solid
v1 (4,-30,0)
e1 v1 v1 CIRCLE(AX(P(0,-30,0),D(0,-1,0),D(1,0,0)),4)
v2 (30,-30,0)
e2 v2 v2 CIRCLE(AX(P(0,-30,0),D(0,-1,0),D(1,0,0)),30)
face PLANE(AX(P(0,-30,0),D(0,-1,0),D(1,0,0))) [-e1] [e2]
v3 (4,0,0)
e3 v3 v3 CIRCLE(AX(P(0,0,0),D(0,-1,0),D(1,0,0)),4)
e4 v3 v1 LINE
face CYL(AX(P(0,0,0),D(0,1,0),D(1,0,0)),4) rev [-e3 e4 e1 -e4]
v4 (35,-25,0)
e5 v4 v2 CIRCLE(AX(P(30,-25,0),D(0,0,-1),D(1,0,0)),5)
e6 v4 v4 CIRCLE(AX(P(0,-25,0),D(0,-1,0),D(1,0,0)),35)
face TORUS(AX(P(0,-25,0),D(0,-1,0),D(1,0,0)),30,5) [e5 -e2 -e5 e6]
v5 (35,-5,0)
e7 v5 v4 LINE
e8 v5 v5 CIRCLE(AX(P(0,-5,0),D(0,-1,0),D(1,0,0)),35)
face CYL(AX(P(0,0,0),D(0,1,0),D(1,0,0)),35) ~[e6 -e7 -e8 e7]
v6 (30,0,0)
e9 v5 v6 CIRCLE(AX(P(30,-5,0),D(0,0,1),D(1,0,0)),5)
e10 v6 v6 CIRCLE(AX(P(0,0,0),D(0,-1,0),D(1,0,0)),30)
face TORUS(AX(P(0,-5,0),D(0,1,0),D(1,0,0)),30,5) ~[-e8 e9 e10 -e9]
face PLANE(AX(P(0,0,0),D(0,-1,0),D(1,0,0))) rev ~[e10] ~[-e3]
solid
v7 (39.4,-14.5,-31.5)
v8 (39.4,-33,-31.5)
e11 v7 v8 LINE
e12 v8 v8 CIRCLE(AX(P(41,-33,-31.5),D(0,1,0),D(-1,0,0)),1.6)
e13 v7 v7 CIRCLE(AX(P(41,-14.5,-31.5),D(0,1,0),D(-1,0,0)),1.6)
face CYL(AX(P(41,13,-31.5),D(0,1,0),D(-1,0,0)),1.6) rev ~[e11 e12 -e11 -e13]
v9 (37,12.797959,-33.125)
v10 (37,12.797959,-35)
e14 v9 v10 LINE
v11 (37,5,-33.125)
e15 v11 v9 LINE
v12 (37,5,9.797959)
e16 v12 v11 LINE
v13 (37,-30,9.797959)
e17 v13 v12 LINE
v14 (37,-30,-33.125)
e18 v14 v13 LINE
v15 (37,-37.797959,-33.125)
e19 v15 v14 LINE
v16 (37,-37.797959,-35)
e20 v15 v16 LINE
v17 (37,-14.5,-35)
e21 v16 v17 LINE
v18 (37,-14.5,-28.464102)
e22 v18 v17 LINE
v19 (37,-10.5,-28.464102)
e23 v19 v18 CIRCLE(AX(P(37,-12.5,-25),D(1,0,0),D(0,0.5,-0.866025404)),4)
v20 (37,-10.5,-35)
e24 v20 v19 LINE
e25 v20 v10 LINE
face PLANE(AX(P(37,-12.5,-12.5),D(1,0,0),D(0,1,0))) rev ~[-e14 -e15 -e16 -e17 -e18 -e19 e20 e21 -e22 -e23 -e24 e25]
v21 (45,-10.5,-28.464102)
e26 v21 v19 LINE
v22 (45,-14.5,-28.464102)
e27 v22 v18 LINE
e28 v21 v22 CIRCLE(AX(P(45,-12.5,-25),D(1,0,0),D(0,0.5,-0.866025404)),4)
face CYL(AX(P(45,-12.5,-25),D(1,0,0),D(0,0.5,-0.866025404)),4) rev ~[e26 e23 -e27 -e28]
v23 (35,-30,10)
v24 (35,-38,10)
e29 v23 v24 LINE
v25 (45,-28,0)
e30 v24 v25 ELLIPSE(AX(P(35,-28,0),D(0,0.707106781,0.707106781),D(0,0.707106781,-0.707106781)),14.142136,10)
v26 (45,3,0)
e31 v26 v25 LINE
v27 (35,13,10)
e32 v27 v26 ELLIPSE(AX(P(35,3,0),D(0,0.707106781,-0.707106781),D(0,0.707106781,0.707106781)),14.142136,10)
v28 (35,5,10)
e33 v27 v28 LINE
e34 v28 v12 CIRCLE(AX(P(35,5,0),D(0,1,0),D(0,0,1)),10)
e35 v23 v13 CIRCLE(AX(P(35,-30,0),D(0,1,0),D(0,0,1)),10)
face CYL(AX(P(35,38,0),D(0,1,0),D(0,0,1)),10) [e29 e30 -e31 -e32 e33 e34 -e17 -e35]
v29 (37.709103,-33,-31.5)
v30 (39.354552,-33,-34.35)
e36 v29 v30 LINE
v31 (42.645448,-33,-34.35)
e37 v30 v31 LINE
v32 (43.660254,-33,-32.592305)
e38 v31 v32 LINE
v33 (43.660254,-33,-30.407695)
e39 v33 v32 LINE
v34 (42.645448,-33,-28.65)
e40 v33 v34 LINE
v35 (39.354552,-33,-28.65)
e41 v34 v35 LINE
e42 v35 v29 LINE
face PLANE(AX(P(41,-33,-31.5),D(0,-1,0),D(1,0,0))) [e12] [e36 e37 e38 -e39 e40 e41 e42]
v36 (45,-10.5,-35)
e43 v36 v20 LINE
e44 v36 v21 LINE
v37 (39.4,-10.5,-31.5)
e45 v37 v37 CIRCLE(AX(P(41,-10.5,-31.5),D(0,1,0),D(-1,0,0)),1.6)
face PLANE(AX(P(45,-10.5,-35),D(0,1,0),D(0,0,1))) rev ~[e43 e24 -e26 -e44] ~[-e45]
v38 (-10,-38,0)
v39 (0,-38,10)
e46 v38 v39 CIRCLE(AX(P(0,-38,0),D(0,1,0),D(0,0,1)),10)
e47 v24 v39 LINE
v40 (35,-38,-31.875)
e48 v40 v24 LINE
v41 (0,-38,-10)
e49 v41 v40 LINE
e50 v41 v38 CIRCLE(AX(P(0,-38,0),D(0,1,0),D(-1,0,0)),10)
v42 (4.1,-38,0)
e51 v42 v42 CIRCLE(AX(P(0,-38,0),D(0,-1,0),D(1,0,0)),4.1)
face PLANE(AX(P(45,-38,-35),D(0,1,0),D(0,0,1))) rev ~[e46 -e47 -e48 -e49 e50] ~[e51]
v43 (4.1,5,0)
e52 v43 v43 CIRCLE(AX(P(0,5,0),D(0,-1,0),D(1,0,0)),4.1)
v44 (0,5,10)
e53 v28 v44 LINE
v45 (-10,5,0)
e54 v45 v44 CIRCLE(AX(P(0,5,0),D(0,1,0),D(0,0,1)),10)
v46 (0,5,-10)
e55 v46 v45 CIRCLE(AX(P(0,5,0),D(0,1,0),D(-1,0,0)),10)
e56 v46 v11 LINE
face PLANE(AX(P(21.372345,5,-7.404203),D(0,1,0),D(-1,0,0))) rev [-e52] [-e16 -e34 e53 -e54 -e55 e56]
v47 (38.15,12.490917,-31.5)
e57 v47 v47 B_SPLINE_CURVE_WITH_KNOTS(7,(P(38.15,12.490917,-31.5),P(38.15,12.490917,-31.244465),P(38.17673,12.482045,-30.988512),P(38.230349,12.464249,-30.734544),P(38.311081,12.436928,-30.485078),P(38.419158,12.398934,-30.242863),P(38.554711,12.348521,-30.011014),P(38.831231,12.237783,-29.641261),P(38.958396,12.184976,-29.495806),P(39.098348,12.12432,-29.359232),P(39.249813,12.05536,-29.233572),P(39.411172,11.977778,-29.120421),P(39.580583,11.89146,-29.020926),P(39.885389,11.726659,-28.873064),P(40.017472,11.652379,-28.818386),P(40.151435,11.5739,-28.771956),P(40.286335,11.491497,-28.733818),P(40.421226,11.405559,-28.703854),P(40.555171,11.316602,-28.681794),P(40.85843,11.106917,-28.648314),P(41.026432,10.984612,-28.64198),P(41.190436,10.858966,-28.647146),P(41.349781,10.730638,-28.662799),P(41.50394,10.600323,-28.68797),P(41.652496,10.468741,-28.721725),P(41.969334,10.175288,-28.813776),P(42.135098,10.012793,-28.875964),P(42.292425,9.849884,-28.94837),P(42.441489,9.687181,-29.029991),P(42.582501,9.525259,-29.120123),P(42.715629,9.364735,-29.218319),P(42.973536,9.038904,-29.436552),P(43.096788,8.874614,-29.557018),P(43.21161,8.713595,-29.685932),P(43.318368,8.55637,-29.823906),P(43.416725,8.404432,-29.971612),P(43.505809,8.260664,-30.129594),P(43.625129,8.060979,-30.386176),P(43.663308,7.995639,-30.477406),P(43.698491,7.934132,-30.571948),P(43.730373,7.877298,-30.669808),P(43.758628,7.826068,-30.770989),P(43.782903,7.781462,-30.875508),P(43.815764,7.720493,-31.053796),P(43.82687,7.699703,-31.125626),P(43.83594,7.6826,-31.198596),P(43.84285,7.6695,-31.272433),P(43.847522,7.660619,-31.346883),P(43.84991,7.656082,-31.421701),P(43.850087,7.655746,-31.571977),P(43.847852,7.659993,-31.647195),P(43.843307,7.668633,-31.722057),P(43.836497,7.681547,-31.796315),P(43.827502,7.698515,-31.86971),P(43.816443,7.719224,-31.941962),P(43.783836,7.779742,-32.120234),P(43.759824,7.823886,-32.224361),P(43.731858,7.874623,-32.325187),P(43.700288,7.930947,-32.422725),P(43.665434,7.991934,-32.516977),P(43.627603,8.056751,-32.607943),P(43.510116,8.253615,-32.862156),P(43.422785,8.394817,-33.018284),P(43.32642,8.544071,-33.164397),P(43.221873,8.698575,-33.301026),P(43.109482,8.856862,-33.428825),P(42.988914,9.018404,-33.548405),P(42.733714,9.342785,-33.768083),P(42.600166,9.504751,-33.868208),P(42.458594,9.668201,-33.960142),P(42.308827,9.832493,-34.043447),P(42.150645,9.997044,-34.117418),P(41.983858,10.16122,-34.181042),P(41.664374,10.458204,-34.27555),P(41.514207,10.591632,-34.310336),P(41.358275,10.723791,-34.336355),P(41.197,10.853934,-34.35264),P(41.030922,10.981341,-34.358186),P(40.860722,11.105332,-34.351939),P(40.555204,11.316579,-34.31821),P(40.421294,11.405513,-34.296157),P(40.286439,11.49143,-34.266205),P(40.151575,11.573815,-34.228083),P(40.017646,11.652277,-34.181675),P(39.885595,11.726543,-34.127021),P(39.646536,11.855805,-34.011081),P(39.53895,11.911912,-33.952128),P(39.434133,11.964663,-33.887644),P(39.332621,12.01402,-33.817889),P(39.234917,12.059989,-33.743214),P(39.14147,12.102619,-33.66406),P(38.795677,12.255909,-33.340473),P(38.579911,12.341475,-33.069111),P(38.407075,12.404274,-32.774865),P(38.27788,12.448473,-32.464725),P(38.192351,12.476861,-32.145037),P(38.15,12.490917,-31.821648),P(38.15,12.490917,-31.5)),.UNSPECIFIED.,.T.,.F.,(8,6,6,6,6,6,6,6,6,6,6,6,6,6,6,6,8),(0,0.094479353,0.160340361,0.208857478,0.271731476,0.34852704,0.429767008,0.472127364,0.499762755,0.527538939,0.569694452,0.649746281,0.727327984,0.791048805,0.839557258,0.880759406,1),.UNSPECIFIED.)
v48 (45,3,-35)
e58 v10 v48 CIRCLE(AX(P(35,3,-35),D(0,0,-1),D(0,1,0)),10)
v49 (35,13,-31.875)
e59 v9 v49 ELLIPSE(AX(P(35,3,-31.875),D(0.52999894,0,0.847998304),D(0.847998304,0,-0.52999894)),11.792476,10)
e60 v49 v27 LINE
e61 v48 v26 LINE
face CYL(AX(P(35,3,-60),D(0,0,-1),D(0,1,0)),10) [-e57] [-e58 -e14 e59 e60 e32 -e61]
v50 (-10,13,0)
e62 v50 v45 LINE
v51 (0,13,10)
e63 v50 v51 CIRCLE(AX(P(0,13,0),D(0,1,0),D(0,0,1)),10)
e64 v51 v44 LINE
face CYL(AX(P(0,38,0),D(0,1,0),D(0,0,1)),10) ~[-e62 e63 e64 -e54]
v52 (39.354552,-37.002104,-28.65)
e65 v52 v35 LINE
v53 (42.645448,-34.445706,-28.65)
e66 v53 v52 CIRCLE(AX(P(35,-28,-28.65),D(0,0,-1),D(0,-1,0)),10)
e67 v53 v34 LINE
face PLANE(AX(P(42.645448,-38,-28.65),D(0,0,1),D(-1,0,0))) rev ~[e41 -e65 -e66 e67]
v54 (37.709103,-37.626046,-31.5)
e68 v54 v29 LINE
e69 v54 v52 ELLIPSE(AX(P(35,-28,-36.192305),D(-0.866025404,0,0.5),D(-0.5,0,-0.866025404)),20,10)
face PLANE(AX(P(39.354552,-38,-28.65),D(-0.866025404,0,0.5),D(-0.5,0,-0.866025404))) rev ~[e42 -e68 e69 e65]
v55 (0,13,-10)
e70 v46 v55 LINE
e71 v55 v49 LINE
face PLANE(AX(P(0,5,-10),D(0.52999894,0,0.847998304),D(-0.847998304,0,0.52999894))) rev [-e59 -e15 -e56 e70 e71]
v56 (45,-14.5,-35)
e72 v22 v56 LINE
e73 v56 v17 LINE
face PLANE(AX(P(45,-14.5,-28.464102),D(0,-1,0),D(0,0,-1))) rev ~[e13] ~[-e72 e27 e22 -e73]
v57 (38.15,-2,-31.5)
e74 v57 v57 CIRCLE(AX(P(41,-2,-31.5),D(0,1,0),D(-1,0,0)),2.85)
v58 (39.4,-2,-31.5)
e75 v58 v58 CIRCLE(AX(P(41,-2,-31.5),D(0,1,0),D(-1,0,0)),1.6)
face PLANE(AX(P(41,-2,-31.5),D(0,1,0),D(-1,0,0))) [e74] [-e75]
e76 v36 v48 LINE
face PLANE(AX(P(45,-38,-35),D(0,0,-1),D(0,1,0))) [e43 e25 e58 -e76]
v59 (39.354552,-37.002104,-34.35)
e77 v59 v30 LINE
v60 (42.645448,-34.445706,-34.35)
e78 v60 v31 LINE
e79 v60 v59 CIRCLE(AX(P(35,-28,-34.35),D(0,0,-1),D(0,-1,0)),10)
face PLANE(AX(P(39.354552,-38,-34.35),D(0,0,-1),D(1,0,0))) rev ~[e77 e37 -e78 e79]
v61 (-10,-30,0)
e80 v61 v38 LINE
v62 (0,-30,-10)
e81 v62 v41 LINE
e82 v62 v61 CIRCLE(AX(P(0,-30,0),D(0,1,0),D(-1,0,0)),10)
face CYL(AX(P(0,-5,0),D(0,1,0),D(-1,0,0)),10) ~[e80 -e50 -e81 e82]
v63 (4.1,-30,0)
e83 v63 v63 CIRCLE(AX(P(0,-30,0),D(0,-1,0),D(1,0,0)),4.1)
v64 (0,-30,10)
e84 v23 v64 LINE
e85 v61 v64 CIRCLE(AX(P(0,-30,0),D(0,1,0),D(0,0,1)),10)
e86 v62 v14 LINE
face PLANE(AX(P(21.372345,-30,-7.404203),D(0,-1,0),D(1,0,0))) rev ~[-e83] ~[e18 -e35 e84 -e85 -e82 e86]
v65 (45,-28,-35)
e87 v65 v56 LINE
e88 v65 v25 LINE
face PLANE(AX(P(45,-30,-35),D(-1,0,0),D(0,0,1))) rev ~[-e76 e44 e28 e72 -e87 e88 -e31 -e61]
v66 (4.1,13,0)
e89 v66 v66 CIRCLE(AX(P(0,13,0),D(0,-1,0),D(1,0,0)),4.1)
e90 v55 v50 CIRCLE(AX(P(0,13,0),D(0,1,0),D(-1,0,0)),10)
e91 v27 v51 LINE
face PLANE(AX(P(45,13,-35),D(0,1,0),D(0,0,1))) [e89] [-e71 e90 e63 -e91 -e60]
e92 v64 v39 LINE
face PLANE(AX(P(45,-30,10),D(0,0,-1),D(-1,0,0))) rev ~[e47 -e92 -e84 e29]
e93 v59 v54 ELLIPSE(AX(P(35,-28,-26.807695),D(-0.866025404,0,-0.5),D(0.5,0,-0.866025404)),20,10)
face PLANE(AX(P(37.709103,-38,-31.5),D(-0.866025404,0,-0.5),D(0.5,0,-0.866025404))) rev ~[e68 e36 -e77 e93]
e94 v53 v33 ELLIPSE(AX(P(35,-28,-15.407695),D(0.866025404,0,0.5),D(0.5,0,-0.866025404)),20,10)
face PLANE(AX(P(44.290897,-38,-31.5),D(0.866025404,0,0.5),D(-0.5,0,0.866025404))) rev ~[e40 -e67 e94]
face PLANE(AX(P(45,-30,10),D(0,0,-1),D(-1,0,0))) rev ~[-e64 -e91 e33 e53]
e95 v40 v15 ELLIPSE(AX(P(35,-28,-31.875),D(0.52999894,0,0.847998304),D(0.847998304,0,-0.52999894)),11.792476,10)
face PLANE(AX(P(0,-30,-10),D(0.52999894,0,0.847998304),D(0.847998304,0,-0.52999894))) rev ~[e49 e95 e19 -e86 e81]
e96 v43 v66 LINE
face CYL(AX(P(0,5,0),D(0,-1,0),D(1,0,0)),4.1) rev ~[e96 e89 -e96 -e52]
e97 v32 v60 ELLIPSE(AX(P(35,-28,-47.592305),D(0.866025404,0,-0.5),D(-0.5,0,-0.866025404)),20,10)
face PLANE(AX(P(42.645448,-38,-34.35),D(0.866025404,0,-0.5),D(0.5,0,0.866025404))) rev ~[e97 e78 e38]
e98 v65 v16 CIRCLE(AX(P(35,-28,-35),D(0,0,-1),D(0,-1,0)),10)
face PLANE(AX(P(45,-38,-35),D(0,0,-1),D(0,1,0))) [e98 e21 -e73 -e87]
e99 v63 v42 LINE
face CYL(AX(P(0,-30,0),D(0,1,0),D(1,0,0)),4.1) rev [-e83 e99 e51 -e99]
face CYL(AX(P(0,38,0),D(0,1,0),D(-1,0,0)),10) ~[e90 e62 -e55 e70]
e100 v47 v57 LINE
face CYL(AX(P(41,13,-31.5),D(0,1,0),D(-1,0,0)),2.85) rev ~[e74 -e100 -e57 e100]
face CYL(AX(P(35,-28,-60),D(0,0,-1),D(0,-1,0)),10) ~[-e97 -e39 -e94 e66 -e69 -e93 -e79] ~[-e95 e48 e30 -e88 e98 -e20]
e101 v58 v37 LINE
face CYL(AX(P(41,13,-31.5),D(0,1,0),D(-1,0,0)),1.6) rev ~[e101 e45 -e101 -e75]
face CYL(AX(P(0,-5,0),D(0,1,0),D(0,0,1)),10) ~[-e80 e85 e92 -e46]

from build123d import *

# Parameters (mm, degrees)
F0_R         = 35
F0_R_2       = 4
F1_DEPTH     = 30
F2_R         = 5
F3_R         = 4.1
F4_DEPTH     = 8
F7_W         = 51
F7_H         = 45
F8_DEPTH     = 8
F11_DEPTH    = 8
F12_R        = 1.6
F13_DEPTH    = 51
F14_R        = 2.85
F15_DEPTH    = 15
F17_DEPTH    = 5
F18_T1_DEPTH = 58
F18_T3_DEPTH = 58
F18_T5_DEPTH = 101
F18_T7_DEPTH = 95


# Not quite as in the source:
# - a fillet or chamfer that OpenCascade refuses, or shapes differently, is made with other operations: its cross-section is extruded or revolved along the edge and cut away or added


with BuildPart() as f1:
    # F0 (on Front) → F1 (new body)
    with BuildSketch(Plane.XZ):
        Circle(F0_R)
        Circle(F0_R_2, mode=Mode.SUBTRACT)
    extrude(amount=F1_DEPTH)

    # F2
    f2_edges = [f1.edges().sort_by_distance(p)[0] for p in [
        (-35, -30, 0),
        (-35, 0, 0),
    ]]
    fillet(f2_edges, radius=F2_R)


with BuildPart() as f4:
    # F3 (on face) → F4 (new body)
    with BuildSketch(Plane.XZ.offset(30)):
        Polygon((45, 10), (0, 10), (-10, 10), (-10, -10), (0, -10), (40, -35), (45, -35), align=None)
        Circle(F3_R, mode=Mode.SUBTRACT)
    extrude(amount=F4_DEPTH)


with BuildPart() as f5_1:
    # F5: instance of F4
    add(f4.part.mirror(Plane(origin=(22.6623991549, -30, -7.1637600407), x_dir=(-1, 0, 0), z_dir=(0, 1, 0))))


with BuildPart() as f5_1_1:
    # F6: moved
    add(f5_1.part.moved(Location((0, 35, 0))))


with BuildPart() as f8:
    # F7 (on face) → F8 (new body)
    with BuildSketch(Plane.YZ.offset(45)):
        with Locations((-12.5, -12.5)):
            Rectangle(F7_W, F7_H)
    extrude(amount=-F8_DEPTH)


with BuildPart() as f4_1:
    add(f4.part)

    # F9: union F8, F5_1
    add(f8.part)
    add(f5_1_1.part)

    # F10 (on face) → F11 (cut)
    with BuildSketch(Plane.YZ.offset(45)):
        with BuildLine():
            Line((-14.5, -35), (-12.5, -35))
            Line((-12.5, -35), (-10.5, -35))
            Line((-10.5, -35), (-10.5, -28.4641016151))
            ThreePointArc((-10.5, -28.4641016151), (-12.5, -21), (-14.5, -28.4641016151))
            Line((-14.5, -28.4641016151), (-14.5, -35))
        make_face()
    extrude(amount=-F11_DEPTH, mode=Mode.SUBTRACT)

    # F12 (on face) → F13 (cut)
    with BuildSketch(Plane(origin=(0, 13, 0), x_dir=(-1, 0, 0), z_dir=(0, 1, 0))):
        with Locations((-41, -31.5)):
            Circle(F12_R)
    extrude(amount=-F13_DEPTH, mode=Mode.SUBTRACT)

    # F14 (on face) → F15 (cut)
    with BuildSketch(Plane(origin=(0, 13, 0), x_dir=(-1, 0, 0), z_dir=(0, 1, 0))):
        with Locations((-41, -31.5)):
            Circle(F14_R)
    extrude(amount=-F15_DEPTH, mode=Mode.SUBTRACT)

    # F16 (on face) → F17 (cut)
    with BuildSketch(Plane.XZ.offset(38)):
        Polygon((42.6454482672, -28.65), (39.3545517328, -28.65), (37.7091034656, -31.5), (39.3545517328, -34.35), (42.6454482672, -34.35), (44.2908965344, -31.5), align=None)
    extrude(amount=-F17_DEPTH, mode=Mode.SUBTRACT)

    # F18: fillet of radius 10 on 7 edges, made by hand

    # F18_s2 → F18_t1 (cut)
    with BuildSketch(Plane.XZ.offset(5)):
        with BuildLine():
            ThreePointArc((-10, 0), (-7.0710678119, -7.0710678119), (0, -10))
            Line((0, -10), (-10, -10))
            Line((-10, -10), (-10, 0))
        make_face()
        with BuildLine():
            ThreePointArc((0, 10), (-7.0710678119, 7.0710678119), (-10, 0))
            Line((-10, 0), (-10, 10))
            Line((-10, 10), (0, 10))
        make_face()
    extrude(amount=F18_T1_DEPTH, mode=Mode.SUBTRACT)

    # F18_s4 → F18_t3 (cut)
    with BuildSketch(Plane.XZ.offset(-38)):
        with BuildLine():
            ThreePointArc((-10, 0), (-7.0710678119, -7.0710678119), (0, -10))
            Line((0, -10), (-10, -10))
            Line((-10, -10), (-10, 0))
        make_face()
        with BuildLine():
            ThreePointArc((0, 10), (-7.0710678119, 7.0710678119), (-10, 0))
            Line((-10, 0), (-10, 10))
            Line((-10, 10), (0, 10))
        make_face()
    extrude(amount=F18_T3_DEPTH, mode=Mode.SUBTRACT)

    # F18_s6 → F18_t5 (cut)
    with BuildSketch(Plane.XZ.offset(-38)):
        with BuildLine():
            ThreePointArc((35, 10), (42.0710678119, 7.0710678119), (45, 0))
            Line((45, 0), (45, 10))
            Line((45, 10), (35, 10))
        make_face()
    extrude(amount=F18_T5_DEPTH, mode=Mode.SUBTRACT)

    # F18_s8 → F18_t7 (cut)
    with BuildSketch(Plane.XY.offset(-60)):
        with BuildLine():
            ThreePointArc((35, 13), (42.0710678119, 10.0710678119), (45, 3))
            Line((45, 3), (45, 13))
            Line((45, 13), (35, 13))
        make_face()
        with BuildLine():
            ThreePointArc((35, -38), (42.0710678119, -35.0710678119), (45, -28))
            Line((45, -28), (45, -38))
            Line((45, -38), (35, -38))
        make_face()
    extrude(amount=F18_T7_DEPTH, mode=Mode.SUBTRACT)


solid = Compound([f1.part, f4_1.part])
